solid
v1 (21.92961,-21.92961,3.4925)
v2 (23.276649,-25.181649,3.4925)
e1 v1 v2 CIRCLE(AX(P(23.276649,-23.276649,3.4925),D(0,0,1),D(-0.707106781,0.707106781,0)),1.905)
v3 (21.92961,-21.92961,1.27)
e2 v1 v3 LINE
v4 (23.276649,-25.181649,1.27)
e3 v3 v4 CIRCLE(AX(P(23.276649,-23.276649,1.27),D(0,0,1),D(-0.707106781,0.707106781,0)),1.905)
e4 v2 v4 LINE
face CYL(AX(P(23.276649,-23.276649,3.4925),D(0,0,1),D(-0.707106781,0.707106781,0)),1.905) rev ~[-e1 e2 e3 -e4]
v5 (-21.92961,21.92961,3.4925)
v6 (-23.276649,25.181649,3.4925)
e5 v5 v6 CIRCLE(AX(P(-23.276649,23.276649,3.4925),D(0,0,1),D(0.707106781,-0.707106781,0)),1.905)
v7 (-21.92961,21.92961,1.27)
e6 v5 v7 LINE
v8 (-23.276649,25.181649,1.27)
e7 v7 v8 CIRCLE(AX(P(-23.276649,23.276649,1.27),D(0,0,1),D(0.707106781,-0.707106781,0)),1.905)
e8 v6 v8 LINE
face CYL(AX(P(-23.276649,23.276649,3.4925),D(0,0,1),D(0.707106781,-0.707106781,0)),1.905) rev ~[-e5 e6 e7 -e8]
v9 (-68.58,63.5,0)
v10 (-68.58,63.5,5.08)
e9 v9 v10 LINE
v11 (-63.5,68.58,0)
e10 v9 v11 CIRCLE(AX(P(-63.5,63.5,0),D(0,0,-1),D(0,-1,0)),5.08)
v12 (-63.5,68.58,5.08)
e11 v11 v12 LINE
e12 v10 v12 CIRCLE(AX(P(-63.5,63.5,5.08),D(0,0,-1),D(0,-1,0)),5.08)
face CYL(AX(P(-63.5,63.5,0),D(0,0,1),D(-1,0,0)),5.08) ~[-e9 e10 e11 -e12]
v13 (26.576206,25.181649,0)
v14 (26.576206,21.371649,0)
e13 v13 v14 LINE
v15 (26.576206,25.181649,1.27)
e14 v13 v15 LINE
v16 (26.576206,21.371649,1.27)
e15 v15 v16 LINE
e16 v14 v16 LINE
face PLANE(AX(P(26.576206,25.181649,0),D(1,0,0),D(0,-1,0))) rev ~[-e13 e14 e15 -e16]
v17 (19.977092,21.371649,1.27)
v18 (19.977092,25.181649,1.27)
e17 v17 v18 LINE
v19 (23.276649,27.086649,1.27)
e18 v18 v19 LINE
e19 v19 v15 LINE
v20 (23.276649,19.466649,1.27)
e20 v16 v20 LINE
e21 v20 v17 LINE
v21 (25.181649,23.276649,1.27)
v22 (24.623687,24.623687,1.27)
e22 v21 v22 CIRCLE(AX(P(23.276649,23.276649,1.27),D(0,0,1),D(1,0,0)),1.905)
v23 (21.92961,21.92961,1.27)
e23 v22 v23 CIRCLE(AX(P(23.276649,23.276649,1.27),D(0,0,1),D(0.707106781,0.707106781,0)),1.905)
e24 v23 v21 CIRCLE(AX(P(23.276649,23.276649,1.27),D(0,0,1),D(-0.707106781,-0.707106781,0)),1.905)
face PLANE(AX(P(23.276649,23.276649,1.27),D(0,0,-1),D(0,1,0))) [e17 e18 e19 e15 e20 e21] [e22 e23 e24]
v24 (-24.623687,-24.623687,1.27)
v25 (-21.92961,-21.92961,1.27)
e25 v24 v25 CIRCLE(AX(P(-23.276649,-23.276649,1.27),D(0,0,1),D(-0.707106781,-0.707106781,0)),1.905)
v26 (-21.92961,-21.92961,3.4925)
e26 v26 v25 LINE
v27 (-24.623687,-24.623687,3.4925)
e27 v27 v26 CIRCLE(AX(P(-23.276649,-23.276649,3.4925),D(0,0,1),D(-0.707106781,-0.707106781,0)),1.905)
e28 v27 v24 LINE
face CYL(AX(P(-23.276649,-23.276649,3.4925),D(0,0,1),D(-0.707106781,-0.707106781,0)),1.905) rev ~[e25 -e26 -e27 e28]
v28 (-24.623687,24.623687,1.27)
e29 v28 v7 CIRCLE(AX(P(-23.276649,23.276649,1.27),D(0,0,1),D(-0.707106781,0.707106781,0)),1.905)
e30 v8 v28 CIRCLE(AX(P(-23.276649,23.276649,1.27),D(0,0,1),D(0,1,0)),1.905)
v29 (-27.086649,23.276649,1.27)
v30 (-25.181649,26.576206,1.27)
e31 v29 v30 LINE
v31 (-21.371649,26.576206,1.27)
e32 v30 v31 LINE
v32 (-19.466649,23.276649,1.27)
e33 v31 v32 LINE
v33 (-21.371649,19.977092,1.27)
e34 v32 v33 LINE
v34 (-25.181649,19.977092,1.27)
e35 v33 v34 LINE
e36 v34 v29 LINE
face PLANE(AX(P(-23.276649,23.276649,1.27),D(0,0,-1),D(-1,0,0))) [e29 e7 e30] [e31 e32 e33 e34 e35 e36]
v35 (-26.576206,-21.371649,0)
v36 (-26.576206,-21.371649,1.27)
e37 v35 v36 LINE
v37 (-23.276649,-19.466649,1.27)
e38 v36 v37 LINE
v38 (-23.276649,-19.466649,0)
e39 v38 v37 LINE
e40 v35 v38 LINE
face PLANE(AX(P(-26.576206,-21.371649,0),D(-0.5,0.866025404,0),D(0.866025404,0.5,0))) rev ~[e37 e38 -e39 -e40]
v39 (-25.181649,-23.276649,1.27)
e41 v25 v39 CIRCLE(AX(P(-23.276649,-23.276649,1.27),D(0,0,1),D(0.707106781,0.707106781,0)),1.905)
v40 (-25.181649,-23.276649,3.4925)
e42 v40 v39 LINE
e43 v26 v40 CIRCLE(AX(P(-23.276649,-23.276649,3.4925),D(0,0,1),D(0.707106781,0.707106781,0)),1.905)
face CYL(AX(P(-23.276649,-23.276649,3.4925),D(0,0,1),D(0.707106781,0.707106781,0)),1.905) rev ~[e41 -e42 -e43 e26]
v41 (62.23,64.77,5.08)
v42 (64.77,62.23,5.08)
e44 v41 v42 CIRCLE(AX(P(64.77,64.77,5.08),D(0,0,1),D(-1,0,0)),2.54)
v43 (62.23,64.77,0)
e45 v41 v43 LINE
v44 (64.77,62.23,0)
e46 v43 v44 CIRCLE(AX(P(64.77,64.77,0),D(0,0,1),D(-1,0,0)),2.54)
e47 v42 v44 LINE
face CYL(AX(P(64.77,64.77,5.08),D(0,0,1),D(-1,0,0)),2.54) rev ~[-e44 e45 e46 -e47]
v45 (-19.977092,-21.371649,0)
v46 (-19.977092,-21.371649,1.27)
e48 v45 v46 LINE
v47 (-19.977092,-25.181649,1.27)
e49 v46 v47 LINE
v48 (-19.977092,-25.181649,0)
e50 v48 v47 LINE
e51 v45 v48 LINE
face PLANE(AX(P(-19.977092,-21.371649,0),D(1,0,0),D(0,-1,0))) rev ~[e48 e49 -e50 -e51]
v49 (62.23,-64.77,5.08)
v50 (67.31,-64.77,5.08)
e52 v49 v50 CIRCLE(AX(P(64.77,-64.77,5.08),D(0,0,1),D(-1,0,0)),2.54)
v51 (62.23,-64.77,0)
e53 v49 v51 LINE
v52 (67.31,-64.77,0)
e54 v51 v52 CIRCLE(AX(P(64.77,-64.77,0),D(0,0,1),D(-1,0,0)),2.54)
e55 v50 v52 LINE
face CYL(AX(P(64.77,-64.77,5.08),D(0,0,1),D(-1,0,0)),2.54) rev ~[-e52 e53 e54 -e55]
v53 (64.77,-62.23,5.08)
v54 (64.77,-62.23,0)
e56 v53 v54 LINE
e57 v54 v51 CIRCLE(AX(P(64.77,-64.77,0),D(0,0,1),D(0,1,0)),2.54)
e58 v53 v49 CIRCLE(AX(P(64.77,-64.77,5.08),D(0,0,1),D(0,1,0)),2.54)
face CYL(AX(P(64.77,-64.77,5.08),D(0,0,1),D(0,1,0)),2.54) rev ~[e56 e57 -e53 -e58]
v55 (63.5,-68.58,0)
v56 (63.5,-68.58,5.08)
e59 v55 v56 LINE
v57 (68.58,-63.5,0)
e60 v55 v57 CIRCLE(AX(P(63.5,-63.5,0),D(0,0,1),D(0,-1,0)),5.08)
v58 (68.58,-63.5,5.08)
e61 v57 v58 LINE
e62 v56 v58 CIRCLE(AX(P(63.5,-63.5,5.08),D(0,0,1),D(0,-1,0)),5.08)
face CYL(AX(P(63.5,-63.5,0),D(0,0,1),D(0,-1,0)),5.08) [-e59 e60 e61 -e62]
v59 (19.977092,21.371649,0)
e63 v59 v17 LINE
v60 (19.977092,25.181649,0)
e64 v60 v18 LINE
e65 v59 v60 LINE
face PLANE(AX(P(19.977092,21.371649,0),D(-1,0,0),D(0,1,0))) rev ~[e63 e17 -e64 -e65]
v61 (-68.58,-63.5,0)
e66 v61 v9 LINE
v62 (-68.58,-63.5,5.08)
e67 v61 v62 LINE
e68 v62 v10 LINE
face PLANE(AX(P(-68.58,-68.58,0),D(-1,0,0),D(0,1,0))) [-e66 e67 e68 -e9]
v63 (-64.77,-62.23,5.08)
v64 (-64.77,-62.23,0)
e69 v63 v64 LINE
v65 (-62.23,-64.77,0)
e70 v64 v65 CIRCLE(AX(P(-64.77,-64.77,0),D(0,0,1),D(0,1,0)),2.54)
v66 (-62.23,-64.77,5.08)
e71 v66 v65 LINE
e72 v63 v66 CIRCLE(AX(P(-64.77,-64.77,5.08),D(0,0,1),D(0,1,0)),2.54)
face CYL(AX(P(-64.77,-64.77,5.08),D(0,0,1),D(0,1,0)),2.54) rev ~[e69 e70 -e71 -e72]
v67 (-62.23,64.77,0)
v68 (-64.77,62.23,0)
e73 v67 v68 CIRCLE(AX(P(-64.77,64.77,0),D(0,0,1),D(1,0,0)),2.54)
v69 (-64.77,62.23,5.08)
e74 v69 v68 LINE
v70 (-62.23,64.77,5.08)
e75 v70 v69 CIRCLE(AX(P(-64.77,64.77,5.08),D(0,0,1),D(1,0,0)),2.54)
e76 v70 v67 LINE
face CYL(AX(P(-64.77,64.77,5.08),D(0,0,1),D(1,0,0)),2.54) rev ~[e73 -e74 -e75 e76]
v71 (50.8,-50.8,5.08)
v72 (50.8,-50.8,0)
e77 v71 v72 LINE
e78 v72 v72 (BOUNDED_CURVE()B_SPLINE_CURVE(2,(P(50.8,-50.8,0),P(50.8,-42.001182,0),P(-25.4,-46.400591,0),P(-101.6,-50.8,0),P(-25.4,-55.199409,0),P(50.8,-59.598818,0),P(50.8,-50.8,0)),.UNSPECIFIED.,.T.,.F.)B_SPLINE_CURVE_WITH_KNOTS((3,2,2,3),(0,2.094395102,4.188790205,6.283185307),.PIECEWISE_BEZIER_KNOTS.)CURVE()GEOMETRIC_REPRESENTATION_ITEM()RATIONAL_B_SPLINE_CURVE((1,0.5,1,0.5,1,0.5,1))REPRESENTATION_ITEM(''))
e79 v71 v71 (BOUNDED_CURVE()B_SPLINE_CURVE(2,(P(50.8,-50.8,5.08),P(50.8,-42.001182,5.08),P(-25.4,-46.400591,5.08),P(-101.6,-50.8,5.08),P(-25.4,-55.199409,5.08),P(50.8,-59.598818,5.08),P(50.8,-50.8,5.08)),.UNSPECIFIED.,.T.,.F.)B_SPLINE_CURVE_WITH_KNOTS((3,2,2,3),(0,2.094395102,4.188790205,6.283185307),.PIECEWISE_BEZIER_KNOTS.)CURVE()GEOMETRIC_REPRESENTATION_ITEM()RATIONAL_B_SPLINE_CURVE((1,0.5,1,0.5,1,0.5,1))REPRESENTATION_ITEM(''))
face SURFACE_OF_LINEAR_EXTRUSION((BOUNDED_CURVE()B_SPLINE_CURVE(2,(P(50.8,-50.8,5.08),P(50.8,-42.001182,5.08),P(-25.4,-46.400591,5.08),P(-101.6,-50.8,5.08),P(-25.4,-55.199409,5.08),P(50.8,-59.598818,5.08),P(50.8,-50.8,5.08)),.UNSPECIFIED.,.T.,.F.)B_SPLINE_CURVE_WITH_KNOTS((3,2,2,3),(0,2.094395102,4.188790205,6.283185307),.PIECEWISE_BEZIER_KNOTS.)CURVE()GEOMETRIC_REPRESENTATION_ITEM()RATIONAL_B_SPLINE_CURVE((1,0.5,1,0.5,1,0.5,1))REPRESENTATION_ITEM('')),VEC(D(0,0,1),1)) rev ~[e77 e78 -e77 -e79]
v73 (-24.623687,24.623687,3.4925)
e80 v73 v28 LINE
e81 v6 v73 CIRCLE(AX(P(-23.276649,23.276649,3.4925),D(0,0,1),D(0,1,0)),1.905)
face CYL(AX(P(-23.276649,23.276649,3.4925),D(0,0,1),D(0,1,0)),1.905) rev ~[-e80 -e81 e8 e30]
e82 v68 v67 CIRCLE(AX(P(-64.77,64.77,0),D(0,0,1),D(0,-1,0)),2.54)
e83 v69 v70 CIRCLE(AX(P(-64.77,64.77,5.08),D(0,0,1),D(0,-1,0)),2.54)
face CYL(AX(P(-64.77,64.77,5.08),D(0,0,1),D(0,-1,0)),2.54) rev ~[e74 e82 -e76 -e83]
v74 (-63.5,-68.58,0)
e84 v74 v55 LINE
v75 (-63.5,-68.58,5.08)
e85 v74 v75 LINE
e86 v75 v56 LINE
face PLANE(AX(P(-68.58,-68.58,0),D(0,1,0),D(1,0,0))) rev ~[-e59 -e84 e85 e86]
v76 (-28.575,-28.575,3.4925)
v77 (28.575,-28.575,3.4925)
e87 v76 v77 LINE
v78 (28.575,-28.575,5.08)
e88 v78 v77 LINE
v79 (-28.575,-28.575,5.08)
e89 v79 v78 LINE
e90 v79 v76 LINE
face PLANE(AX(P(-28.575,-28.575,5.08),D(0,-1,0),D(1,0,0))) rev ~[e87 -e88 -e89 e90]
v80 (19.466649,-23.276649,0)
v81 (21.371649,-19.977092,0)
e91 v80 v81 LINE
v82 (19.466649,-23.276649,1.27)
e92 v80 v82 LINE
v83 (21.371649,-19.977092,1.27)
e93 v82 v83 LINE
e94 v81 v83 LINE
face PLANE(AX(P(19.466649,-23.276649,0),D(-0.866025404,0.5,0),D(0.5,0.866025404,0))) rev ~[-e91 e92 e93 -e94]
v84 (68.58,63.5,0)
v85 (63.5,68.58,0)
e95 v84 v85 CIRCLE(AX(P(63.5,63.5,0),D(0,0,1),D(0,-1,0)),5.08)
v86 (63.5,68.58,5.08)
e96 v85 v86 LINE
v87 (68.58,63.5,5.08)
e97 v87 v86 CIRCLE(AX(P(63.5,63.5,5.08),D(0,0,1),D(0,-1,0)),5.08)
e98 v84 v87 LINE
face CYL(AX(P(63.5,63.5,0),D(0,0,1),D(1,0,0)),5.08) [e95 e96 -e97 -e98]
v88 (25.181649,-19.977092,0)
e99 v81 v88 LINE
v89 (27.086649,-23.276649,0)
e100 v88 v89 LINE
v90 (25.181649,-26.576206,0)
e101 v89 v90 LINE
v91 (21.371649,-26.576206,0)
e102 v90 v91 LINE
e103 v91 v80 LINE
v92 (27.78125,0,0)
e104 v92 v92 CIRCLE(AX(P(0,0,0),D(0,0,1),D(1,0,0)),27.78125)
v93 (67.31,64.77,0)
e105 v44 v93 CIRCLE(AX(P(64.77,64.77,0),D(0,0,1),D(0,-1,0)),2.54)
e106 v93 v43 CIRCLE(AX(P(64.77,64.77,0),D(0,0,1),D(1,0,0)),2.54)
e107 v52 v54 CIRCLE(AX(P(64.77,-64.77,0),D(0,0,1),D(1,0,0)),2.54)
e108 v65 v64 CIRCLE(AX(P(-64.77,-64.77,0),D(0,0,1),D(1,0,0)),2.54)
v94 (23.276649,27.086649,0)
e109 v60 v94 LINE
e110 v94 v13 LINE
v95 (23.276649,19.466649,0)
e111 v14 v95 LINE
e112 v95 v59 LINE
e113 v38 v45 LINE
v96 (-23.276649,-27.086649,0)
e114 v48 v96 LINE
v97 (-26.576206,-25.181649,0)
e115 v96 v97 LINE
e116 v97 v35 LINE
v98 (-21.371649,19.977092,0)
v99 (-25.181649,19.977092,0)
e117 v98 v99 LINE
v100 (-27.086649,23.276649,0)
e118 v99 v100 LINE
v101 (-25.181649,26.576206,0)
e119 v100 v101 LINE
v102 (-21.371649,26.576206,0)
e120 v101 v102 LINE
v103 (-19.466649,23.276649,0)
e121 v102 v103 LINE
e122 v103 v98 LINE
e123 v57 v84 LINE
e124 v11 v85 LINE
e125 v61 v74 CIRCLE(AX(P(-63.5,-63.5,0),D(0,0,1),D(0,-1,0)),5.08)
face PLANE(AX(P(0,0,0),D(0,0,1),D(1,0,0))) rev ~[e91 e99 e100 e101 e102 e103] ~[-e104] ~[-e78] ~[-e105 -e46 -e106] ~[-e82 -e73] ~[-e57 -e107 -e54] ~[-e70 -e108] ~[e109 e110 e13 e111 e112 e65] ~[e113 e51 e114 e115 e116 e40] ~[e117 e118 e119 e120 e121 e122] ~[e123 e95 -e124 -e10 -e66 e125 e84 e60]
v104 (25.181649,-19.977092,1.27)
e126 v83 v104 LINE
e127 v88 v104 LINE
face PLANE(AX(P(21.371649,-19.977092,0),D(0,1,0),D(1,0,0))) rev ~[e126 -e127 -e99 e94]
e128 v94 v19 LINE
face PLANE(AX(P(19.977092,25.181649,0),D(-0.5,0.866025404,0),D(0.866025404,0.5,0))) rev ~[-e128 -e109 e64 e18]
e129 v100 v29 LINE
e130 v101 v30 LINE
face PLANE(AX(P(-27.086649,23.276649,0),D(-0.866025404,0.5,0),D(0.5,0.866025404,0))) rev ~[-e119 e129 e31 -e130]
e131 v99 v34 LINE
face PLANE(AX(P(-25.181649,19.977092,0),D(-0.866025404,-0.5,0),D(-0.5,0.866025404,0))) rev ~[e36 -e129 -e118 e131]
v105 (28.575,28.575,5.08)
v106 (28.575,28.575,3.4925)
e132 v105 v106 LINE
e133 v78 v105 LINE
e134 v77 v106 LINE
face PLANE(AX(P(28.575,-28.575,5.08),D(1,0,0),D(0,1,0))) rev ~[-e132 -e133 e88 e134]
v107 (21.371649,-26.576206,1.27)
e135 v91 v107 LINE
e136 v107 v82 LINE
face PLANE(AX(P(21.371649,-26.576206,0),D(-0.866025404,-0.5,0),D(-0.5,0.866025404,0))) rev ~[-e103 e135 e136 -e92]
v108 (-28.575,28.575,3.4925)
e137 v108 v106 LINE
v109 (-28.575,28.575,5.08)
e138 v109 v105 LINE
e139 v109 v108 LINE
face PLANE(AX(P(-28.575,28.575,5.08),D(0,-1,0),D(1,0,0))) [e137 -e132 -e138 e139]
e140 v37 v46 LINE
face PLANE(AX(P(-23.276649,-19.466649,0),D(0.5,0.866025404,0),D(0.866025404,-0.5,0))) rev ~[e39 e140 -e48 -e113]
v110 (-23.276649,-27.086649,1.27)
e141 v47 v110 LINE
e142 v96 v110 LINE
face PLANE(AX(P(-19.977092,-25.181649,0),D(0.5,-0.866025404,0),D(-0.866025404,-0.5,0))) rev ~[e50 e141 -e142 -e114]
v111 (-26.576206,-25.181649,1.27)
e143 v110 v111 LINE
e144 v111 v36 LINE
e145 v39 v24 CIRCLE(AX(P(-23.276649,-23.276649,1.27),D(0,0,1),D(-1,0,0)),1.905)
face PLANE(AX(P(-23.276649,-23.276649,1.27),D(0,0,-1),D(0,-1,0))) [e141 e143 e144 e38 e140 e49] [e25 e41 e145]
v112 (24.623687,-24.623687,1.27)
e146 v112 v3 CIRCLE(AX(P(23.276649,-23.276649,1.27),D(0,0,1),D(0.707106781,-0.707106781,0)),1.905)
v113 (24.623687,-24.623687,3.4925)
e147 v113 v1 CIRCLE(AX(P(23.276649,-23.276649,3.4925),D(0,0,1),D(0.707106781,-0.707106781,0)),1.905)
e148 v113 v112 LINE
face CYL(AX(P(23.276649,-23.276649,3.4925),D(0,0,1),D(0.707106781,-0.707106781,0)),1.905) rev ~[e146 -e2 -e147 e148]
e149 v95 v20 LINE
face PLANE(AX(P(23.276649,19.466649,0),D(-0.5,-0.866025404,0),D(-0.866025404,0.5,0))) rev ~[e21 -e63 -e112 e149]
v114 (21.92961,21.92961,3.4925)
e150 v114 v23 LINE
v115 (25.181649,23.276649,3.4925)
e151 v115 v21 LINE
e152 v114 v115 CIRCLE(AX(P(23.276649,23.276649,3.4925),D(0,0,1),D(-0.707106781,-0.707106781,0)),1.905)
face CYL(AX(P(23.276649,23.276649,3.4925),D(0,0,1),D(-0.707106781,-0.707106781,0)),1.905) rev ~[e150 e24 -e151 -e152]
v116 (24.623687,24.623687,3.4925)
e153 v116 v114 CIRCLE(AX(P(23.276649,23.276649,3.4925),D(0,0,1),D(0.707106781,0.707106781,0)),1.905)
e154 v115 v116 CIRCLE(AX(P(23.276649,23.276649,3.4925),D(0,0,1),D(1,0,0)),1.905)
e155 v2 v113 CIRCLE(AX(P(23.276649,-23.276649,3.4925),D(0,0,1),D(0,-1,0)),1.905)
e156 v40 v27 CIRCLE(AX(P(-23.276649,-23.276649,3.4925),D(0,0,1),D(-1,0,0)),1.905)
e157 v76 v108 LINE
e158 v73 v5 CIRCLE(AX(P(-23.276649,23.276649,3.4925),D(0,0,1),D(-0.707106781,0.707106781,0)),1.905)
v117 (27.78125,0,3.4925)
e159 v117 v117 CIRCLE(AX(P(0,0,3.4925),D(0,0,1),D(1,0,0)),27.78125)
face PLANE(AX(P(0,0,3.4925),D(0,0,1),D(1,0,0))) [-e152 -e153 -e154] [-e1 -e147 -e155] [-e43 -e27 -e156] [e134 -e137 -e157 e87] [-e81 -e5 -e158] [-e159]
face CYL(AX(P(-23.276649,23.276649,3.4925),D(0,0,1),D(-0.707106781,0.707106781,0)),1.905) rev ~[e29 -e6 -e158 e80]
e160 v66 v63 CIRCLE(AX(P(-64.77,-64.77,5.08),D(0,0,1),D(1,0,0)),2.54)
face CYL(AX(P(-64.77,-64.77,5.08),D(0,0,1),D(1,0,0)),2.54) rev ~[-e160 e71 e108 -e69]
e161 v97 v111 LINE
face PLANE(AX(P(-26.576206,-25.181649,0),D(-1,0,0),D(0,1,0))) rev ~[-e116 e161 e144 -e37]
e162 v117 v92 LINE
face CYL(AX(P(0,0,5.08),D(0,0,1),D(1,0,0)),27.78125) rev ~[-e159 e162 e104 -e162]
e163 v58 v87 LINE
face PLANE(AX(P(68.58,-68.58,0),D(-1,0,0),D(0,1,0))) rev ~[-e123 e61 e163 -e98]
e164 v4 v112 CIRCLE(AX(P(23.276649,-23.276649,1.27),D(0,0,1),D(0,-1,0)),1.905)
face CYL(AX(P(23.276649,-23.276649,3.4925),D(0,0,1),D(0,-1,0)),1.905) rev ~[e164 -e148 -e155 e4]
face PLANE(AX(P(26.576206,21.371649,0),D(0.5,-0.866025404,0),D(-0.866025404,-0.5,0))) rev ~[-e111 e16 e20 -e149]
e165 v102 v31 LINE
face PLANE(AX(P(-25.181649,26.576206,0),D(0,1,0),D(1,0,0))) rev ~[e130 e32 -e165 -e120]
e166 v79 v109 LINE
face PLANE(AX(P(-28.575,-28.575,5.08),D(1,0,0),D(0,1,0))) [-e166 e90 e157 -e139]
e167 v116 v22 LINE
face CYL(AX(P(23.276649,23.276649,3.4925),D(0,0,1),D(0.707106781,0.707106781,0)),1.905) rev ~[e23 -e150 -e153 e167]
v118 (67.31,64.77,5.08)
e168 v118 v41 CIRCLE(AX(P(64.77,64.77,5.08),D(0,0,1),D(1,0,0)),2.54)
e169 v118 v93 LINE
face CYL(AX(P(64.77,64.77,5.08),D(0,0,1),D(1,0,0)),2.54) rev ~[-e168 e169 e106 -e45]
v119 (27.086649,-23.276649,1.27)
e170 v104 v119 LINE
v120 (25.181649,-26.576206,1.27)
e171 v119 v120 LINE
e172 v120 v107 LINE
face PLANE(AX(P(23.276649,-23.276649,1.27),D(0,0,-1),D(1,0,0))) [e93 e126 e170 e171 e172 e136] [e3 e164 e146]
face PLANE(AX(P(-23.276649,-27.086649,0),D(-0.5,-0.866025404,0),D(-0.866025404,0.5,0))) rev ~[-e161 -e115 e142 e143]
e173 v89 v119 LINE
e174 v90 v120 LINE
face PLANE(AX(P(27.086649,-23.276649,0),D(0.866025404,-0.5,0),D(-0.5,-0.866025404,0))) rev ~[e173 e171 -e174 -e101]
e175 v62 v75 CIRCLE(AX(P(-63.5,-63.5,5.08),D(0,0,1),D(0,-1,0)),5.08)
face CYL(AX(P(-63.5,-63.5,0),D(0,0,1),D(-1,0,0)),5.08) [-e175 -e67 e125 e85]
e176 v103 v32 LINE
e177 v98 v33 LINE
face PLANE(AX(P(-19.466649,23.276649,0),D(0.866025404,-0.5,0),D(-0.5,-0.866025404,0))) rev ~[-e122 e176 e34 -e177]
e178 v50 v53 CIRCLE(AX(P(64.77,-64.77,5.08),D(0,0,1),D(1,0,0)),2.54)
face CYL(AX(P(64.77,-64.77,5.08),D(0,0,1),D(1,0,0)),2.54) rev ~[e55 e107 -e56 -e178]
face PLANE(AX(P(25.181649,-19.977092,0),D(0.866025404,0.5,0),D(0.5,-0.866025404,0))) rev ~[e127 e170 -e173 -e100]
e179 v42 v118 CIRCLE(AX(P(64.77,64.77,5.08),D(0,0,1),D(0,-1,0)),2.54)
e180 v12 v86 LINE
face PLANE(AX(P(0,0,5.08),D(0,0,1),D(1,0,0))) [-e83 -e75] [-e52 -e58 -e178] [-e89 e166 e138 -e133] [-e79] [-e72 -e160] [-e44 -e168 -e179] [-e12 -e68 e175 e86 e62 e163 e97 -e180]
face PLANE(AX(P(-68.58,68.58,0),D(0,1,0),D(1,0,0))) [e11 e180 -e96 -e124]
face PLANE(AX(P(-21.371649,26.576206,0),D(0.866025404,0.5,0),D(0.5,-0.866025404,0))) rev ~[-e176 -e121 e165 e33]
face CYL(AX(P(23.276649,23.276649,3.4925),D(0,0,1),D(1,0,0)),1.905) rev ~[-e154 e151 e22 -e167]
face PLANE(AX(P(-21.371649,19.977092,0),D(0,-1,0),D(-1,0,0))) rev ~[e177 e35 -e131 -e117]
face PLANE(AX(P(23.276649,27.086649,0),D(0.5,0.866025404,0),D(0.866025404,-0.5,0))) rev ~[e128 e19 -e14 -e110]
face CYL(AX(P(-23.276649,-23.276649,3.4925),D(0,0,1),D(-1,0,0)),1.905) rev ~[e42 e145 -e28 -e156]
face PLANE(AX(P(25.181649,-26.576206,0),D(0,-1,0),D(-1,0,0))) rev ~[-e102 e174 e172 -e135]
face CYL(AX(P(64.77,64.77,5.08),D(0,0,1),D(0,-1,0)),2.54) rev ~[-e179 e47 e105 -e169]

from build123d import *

# Parameters (mm, degrees)
F0_W             = 137.16
F0_H             = 137.16
F1_DEPTH         = 5.08
F2_R             = 5.08
F3_R             = 27.78125
F4_DEPTH         = 5.08
F5_W             = 57.15
F5_H             = 57.15
F6_DEPTH         = 1.5875
F8_DEPTH         = 3.4925
F8_COPIES_COUNT  = 4
F11_DEPTH        = 1.27
F11_COPIES_COUNT = 4
F13_DEPTH        = 5.08
F15_DEPTH        = 5.08


# Not quite as in the source:
# - a pattern or mirror of a feature is missing from the dataset's text; its kind, count and spacing are read off the source's solid


with BuildPart() as f1:
    # F0 (on Top) → F1 (new body)
    with BuildSketch(Plane.XY):
        Rectangle(F0_W, F0_H)
    extrude(amount=F1_DEPTH)

    # F2
    f2_edges = [f1.edges().sort_by_distance(p)[0] for p in [
        (-68.58, -68.58, 2.54),
        (68.58, -68.58, 2.54),
        (68.58, 68.58, 2.54),
        (-68.58, 68.58, 2.54),
    ]]
    fillet(f2_edges, radius=F2_R)

    # F3 (on face) → F4 (cut, through all)
    with BuildSketch(Plane.XY.offset(5.08)):
        Circle(F3_R)
    extrude(amount=-F4_DEPTH, mode=Mode.SUBTRACT)

    # F5 (on face) → F6 (cut)
    with BuildSketch(Plane.XY.offset(5.08)):
        Rectangle(F5_W, F5_H)
    extrude(amount=-F6_DEPTH, mode=Mode.SUBTRACT)

    # F7 (on face) → F8 (cut, through all)
    with BuildSketch(Plane.XY.offset(3.4925)):
        with BuildLine():
            Line((21.9296104704, 21.9296104704), (24.6236873067, 24.6236873067))
            ThreePointArc((24.6236873067, 24.6236873067), (21.9296104704, 24.6236873067), (21.9296104704, 21.9296104704))
        make_face()
        with BuildLine():
            ThreePointArc((25.1816488886, 23.2766488886), (25.036639398, 24.0056608272), (24.6236873067, 24.6236873067))
            Line((24.6236873067, 24.6236873067), (21.9296104704, 21.9296104704))
            ThreePointArc((21.9296104704, 21.9296104704), (24.0056608272, 21.5166583791), (25.1816488886, 23.2766488886))
        make_face()
    f8 = extrude(amount=-F8_DEPTH, mode=Mode.SUBTRACT)

    # F8_copies: F8 ×4 about axis
    f8_copies_axis = Axis((0, 0, 0), (0, 0, 1))
    for i in range(1, F8_COPIES_COUNT):
        add(f8.rotate(f8_copies_axis, i * 360 / F8_COPIES_COUNT), mode=Mode.SUBTRACT)

    # F10 (on face) → F11 (cut)
    with BuildSketch(Plane(origin=(0, 0, 0), x_dir=(1, 0, 0), z_dir=(0, 0, -1))):
        Polygon((27.0866488886, 23.2766488886), (25.1816488886, 26.576205677), (21.3716488886, 26.576205677), (19.4666488886, 23.2766488886), (21.3716488886, 19.9770921002), (25.1816488886, 19.9770921002), align=None)
    f11 = extrude(amount=-F11_DEPTH, mode=Mode.SUBTRACT)

    # F11_copies: F11 ×4 about axis
    f11_copies_axis = Axis((0, 0, 0), (0, 0, 1))
    for i in range(1, F11_COPIES_COUNT):
        add(f11.rotate(f11_copies_axis, i * 360 / F11_COPIES_COUNT), mode=Mode.SUBTRACT)

    # F12 (on face) → F13 (cut, through all)
    with BuildSketch(Plane.XY.offset(5.08)):
        with BuildLine():
            Line((-64.77, 64.77), (-62.23, 64.77))
            ThreePointArc((-62.23, 64.77), (-66.5660512242, 66.5660512242), (-64.77, 62.23))
            Line((-64.77, 62.23), (-64.77, 64.77))
        make_face()
        with BuildLine():
            ThreePointArc((-64.77, 62.23), (-62.9739487758, 62.9739487758), (-62.23, 64.77))
            Line((-62.23, 64.77), (-64.77, 64.77))
            Line((-64.77, 64.77), (-64.77, 62.23))
        make_face()
        with BuildLine():
            Line((-64.77, -64.77), (-64.77, -62.23))
            ThreePointArc((-64.77, -62.23), (-66.5660512242, -66.5660512242), (-62.23, -64.77))
            Line((-62.23, -64.77), (-64.77, -64.77))
        make_face()
        with BuildLine():
            ThreePointArc((-62.23, -64.77), (-62.9739487758, -62.9739487758), (-64.77, -62.23))
            Line((-64.77, -62.23), (-64.77, -64.77))
            Line((-64.77, -64.77), (-62.23, -64.77))
        make_face()
        with BuildLine():
            ThreePointArc((67.31, -64.77), (66.5660512242, -62.9739487758), (64.77, -62.23))
            Line((64.77, -62.23), (64.77, -64.77))
            Line((64.77, -64.77), (62.23, -64.77))
            ThreePointArc((62.23, -64.77), (64.77, -67.31), (67.31, -64.77))
        make_face()
        with BuildLine():
            Line((64.77, -64.77), (64.77, -62.23))
            ThreePointArc((64.77, -62.23), (62.9739487758, -62.9739487758), (62.23, -64.77))
            Line((62.23, -64.77), (64.77, -64.77))
        make_face()
        with BuildLine():
            Line((64.77, 64.77), (62.23, 64.77))
            ThreePointArc((62.23, 64.77), (62.9739487758, 62.9739487758), (64.77, 62.23))
            Line((64.77, 62.23), (64.77, 64.77))
        make_face()
        with BuildLine():
            ThreePointArc((67.31, 64.77), (64.77, 67.31), (62.23, 64.77))
            Line((62.23, 64.77), (64.77, 64.77))
            Line((64.77, 64.77), (64.77, 62.23))
            ThreePointArc((64.77, 62.23), (66.5660512242, 62.9739487758), (67.31, 64.77))
        make_face()
    extrude(amount=-F13_DEPTH, mode=Mode.SUBTRACT)

    # F14 (on face) → F15 (cut, through all)
    with BuildSketch(Plane.XY.offset(5.08)):
        with BuildLine():
            add(Edge.make_bspline(
                [(50.8, -50.8), (50.8, -42.0011818976), (-25.4, -46.4005909488), (-101.6, -50.8), (-25.4, -55.1994090512), (50.8, -59.5988181024), (50.8, -50.8)],
                knots=[0, 0, 0, 2.0943951024, 2.0943951024, 4.1887902048, 4.1887902048, 6.2831853072, 6.2831853072, 6.2831853072], degree=2, weights=[1, 0.5, 1, 0.5, 1, 0.5, 1]))
        make_face()
    extrude(amount=-F15_DEPTH, mode=Mode.SUBTRACT)


solid = f1.part
